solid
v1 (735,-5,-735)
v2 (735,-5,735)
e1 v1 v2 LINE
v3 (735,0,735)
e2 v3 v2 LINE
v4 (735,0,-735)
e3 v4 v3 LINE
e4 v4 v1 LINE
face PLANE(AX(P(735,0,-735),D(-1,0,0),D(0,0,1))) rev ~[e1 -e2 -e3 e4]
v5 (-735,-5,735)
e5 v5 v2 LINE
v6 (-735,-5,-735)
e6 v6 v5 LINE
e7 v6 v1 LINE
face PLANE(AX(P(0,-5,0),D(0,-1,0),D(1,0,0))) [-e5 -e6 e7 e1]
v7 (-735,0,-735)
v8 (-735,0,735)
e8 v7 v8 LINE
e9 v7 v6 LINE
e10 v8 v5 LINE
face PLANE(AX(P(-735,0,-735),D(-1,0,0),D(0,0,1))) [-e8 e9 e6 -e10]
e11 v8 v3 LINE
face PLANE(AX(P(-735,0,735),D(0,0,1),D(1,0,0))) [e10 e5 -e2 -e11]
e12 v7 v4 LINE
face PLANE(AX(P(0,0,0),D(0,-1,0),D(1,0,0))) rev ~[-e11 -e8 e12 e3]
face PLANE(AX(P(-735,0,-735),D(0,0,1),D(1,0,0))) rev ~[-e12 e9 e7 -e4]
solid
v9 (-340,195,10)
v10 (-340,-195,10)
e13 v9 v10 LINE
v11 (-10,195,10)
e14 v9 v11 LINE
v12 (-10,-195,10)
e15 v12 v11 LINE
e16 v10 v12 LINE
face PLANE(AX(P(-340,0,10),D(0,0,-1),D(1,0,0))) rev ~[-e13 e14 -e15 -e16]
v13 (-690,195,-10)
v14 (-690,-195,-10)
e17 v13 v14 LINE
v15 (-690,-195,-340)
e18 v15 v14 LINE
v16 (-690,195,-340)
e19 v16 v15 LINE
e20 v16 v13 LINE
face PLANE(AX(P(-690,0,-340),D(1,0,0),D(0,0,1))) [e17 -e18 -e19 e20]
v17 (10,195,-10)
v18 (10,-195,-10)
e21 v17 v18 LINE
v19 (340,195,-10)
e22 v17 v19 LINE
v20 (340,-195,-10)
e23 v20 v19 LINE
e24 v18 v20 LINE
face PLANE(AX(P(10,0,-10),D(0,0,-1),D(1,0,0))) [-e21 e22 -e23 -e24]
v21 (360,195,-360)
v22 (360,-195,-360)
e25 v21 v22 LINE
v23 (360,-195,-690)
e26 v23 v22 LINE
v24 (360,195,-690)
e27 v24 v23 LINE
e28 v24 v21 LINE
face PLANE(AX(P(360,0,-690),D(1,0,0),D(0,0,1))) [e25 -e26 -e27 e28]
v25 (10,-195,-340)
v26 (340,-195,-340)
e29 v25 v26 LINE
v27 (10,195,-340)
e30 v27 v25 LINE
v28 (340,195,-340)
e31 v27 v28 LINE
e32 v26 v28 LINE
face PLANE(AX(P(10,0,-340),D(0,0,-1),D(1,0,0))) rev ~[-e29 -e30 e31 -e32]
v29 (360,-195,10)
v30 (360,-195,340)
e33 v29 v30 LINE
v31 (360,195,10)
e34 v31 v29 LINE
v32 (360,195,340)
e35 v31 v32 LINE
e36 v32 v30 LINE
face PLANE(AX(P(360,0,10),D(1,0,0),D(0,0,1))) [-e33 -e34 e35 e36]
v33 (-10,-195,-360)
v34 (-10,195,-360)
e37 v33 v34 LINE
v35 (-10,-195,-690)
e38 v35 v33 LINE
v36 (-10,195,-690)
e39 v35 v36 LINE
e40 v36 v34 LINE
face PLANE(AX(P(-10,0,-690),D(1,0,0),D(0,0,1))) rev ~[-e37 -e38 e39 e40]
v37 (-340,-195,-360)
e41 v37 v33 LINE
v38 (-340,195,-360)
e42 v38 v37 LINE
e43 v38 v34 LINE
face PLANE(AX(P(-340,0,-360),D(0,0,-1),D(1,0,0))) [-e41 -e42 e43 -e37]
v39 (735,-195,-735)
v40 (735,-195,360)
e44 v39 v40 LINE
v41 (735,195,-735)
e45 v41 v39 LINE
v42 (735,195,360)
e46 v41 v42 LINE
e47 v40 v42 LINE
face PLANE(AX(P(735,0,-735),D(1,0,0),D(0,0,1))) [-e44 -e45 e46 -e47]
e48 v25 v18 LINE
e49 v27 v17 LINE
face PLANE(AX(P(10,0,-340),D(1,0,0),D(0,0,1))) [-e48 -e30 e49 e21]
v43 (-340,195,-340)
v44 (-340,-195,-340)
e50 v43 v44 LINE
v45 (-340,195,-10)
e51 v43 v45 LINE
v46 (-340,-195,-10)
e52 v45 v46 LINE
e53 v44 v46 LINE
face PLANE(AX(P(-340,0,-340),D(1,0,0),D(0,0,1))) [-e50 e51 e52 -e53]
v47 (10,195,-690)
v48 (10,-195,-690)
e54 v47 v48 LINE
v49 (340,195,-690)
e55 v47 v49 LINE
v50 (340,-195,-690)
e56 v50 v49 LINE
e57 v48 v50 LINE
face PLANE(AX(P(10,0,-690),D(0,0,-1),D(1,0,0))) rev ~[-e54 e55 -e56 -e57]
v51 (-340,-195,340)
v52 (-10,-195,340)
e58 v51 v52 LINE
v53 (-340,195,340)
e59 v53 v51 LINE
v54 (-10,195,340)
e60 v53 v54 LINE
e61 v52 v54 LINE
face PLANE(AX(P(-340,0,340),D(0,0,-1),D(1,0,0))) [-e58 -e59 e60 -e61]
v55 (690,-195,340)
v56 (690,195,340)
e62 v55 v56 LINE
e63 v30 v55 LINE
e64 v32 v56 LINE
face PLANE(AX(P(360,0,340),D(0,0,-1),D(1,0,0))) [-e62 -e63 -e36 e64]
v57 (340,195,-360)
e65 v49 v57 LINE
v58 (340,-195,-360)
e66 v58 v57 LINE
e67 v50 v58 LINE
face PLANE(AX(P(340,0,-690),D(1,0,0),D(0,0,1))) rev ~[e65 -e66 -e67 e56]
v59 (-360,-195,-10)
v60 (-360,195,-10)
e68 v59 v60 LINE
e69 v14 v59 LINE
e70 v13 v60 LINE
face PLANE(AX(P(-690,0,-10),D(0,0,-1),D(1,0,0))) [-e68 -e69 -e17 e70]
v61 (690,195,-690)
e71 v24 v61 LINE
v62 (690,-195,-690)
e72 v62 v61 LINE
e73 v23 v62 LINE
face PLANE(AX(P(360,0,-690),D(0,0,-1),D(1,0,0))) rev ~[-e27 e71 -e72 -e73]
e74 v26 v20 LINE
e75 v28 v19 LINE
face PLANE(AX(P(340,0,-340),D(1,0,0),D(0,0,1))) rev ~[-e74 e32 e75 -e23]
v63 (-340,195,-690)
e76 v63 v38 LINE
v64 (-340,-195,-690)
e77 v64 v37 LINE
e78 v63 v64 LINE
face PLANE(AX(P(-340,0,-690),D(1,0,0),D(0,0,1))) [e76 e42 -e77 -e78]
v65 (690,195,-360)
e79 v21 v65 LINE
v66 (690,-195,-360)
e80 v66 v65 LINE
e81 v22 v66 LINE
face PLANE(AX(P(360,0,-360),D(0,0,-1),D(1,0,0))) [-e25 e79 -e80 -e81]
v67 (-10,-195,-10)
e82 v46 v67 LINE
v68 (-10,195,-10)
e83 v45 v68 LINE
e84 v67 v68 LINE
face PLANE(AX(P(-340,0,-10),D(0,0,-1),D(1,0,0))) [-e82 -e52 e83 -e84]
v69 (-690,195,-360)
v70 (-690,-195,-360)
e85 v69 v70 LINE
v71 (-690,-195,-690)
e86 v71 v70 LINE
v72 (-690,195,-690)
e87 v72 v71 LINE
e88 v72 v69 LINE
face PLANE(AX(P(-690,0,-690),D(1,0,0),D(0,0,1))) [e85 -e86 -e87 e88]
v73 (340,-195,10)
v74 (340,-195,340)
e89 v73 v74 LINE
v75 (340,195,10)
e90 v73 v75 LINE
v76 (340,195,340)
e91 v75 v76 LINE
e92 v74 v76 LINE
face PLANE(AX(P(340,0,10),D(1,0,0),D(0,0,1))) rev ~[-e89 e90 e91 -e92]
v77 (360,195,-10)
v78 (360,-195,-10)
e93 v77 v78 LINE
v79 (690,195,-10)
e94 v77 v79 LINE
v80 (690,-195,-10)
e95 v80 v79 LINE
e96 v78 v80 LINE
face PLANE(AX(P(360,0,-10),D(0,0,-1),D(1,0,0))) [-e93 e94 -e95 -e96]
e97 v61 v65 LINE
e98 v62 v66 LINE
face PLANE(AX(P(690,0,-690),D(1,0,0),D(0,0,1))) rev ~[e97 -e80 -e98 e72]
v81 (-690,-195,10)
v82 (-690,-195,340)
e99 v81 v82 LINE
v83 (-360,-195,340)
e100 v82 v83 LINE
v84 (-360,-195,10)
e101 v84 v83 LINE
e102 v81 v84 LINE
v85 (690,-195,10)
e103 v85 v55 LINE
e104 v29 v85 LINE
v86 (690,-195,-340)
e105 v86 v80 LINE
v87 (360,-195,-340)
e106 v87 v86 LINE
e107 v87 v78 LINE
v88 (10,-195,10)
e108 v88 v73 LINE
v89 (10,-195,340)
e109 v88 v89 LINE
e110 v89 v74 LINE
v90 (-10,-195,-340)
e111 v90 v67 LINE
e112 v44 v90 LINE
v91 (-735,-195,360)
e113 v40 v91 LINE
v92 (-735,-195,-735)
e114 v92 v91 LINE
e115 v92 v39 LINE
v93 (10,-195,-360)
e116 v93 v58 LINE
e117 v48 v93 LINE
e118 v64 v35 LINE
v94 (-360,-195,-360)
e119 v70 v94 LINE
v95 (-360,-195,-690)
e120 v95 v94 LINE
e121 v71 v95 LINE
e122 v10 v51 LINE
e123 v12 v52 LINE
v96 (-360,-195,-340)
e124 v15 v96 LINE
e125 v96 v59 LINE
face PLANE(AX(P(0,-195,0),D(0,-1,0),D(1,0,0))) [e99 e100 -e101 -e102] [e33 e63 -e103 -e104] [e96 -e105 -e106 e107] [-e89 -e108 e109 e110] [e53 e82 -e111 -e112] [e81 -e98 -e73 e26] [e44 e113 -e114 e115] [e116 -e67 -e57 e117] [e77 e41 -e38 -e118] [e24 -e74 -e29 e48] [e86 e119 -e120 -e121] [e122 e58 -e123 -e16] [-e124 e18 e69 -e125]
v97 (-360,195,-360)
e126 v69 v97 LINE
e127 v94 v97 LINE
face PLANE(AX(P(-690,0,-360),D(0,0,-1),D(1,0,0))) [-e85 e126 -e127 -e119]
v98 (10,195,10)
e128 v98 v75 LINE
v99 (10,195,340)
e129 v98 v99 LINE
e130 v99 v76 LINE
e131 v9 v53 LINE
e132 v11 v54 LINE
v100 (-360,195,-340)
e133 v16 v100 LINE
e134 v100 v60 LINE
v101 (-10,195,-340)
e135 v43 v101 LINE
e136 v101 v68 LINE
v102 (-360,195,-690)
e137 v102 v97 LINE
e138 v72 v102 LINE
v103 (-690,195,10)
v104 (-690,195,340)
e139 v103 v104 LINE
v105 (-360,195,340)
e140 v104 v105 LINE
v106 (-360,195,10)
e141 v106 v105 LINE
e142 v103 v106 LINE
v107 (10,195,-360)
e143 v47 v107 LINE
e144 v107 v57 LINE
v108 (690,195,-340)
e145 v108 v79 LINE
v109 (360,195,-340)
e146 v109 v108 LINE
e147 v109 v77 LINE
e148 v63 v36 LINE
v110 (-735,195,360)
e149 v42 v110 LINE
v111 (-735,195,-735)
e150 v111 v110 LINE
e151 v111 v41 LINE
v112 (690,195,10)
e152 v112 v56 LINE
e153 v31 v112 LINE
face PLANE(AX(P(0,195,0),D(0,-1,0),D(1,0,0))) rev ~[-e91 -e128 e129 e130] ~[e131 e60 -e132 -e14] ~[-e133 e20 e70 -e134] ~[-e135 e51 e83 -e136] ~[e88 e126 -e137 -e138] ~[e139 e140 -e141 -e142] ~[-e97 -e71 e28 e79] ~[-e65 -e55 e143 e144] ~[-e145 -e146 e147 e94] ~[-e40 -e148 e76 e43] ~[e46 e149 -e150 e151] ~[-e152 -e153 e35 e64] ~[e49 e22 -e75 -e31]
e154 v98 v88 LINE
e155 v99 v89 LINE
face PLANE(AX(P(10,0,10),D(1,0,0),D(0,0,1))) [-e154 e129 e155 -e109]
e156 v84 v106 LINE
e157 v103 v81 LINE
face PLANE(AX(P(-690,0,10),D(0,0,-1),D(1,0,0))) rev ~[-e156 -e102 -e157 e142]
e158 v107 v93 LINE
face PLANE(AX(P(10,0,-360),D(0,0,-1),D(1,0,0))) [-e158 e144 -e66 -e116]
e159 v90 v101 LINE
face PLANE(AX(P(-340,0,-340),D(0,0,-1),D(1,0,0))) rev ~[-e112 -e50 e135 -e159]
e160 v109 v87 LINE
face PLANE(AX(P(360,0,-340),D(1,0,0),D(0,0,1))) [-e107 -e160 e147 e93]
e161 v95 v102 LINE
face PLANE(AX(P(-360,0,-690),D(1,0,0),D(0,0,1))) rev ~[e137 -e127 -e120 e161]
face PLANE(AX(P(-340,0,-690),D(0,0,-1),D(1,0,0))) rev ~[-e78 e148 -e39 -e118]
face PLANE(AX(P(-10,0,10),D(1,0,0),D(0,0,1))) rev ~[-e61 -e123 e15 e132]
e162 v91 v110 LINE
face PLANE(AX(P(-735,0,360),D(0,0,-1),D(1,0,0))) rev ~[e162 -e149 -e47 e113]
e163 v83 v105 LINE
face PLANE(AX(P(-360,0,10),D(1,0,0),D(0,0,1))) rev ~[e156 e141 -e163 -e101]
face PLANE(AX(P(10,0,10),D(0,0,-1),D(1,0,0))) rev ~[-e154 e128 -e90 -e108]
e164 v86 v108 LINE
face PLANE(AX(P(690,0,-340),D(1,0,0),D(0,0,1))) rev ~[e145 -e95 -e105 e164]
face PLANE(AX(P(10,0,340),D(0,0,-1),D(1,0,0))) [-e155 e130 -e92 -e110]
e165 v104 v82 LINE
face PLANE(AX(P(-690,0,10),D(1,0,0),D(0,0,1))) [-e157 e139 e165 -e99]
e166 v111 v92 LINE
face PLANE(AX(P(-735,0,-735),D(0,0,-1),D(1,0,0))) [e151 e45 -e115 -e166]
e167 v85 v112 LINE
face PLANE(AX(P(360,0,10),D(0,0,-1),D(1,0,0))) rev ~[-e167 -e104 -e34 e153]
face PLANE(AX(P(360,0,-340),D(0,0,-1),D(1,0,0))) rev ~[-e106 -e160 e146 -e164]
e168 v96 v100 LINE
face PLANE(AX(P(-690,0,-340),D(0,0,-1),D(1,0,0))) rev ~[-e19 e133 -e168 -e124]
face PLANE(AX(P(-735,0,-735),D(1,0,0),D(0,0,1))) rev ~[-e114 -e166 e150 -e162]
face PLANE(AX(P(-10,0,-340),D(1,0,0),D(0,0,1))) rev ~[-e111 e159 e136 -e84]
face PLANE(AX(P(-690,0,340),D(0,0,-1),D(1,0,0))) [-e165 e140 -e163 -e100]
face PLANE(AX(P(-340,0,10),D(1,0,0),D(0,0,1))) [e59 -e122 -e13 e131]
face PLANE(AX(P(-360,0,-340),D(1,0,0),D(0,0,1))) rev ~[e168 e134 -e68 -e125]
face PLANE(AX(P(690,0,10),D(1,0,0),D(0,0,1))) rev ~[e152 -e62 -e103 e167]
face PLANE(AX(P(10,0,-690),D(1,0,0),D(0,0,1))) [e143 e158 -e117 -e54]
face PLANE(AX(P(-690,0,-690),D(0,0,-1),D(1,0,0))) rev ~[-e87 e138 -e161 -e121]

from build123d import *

# Parameters (mm, degrees)
F0_W     = 1470
F0_H     = 1470
F0_W_2   = 330
F0_H_2   = 330
F1_DEPTH = 195
F2_DEPTH = 5
F3_DEPTH = 375


with BuildPart() as f1:
    # F0 (on Front) → F1 (new body, symmetric)
    with BuildSketch(Plane.XZ):
        Rectangle(F0_W, F0_H)
        with Locations((-525, -525)):
            Rectangle(F0_W_2, F0_H_2, mode=Mode.SUBTRACT)
        with Locations((-175, -525)):
            Rectangle(F0_W_2, F0_H_2, mode=Mode.SUBTRACT)
        with Locations((-525, -175)):
            Rectangle(F0_W_2, F0_H_2, mode=Mode.SUBTRACT)
        with Locations((-175, -175)):
            Rectangle(F0_W_2, F0_H_2, mode=Mode.SUBTRACT)
        with Locations((175, -525)):
            Rectangle(F0_W_2, F0_H_2, mode=Mode.SUBTRACT)
        with Locations((525, -525)):
            Rectangle(F0_W_2, F0_H_2, mode=Mode.SUBTRACT)
        with Locations((175, -175)):
            Rectangle(F0_W_2, F0_H_2, mode=Mode.SUBTRACT)
        with Locations((525, -175)):
            Rectangle(F0_W_2, F0_H_2, mode=Mode.SUBTRACT)
        with Locations((-525, 175)):
            Rectangle(F0_W_2, F0_H_2, mode=Mode.SUBTRACT)
        with Locations((-175, 175)):
            Rectangle(F0_W_2, F0_H_2, mode=Mode.SUBTRACT)
        with Locations((-525, 525)):
            Rectangle(F0_W_2, F0_H_2, mode=Mode.SUBTRACT)
        with Locations((-175, 525)):
            Rectangle(F0_W_2, F0_H_2, mode=Mode.SUBTRACT)
        with Locations((175, 175)):
            Rectangle(F0_W_2, F0_H_2, mode=Mode.SUBTRACT)
        with Locations((525, 175)):
            Rectangle(F0_W_2, F0_H_2, mode=Mode.SUBTRACT)
        with Locations((175, 525)):
            Rectangle(F0_W_2, F0_H_2, mode=Mode.SUBTRACT)
        with Locations((525, 525)):
            Rectangle(F0_W_2, F0_H_2, mode=Mode.SUBTRACT)
    extrude(amount=F1_DEPTH, both=True)

    # F3 (cut, through all): a face of the model
    f3_faces = [f1.faces().sort_by_distance(p)[0] for p in [
        (0, 0, 735),
    ]]
    extrude(f3_faces, amount=-F3_DEPTH, mode=Mode.SUBTRACT)


with BuildPart() as f2:
    # F0 (on Front) → F2 (new body)
    with BuildSketch(Plane.XZ):
        Rectangle(F0_W, F0_H)
        with Locations((-525, -525)):
            Rectangle(F0_W_2, F0_H_2, mode=Mode.SUBTRACT)
        with Locations((-175, -525)):
            Rectangle(F0_W_2, F0_H_2, mode=Mode.SUBTRACT)
        with Locations((-525, -175)):
            Rectangle(F0_W_2, F0_H_2, mode=Mode.SUBTRACT)
        with Locations((-175, -175)):
            Rectangle(F0_W_2, F0_H_2, mode=Mode.SUBTRACT)
        with Locations((175, -525)):
            Rectangle(F0_W_2, F0_H_2, mode=Mode.SUBTRACT)
        with Locations((525, -525)):
            Rectangle(F0_W_2, F0_H_2, mode=Mode.SUBTRACT)
        with Locations((175, -175)):
            Rectangle(F0_W_2, F0_H_2, mode=Mode.SUBTRACT)
        with Locations((525, -175)):
            Rectangle(F0_W_2, F0_H_2, mode=Mode.SUBTRACT)
        with Locations((-525, 175)):
            Rectangle(F0_W_2, F0_H_2, mode=Mode.SUBTRACT)
        with Locations((-175, 175)):
            Rectangle(F0_W_2, F0_H_2, mode=Mode.SUBTRACT)
        with Locations((-525, 525)):
            Rectangle(F0_W_2, F0_H_2, mode=Mode.SUBTRACT)
        with Locations((-175, 525)):
            Rectangle(F0_W_2, F0_H_2, mode=Mode.SUBTRACT)
        with Locations((175, 175)):
            Rectangle(F0_W_2, F0_H_2, mode=Mode.SUBTRACT)
        with Locations((525, 175)):
            Rectangle(F0_W_2, F0_H_2, mode=Mode.SUBTRACT)
        with Locations((175, 525)):
            Rectangle(F0_W_2, F0_H_2, mode=Mode.SUBTRACT)
        with Locations((525, 525)):
            Rectangle(F0_W_2, F0_H_2, mode=Mode.SUBTRACT)
        with Locations((525, 525)):
            Rectangle(F0_W_2, F0_H_2)
        with Locations((175, 525)):
            Rectangle(F0_W_2, F0_H_2)
        with Locations((-175, 525)):
            Rectangle(F0_W_2, F0_H_2)
        with Locations((-525, 525)):
            Rectangle(F0_W_2, F0_H_2)
        with Locations((-525, 175)):
            Rectangle(F0_W_2, F0_H_2)
        with Locations((-175, 175)):
            Rectangle(F0_W_2, F0_H_2)
        with Locations((-175, -175)):
            Rectangle(F0_W_2, F0_H_2)
        with Locations((-525, -175)):
            Rectangle(F0_W_2, F0_H_2)
        with Locations((-525, -525)):
            Rectangle(F0_W_2, F0_H_2)
        with Locations((-175, -525)):
            Rectangle(F0_W_2, F0_H_2)
        with Locations((175, -525)):
            Rectangle(F0_W_2, F0_H_2)
        with Locations((525, -525)):
            Rectangle(F0_W_2, F0_H_2)
        with Locations((525, -175)):
            Rectangle(F0_W_2, F0_H_2)
        with Locations((525, 175)):
            Rectangle(F0_W_2, F0_H_2)
        with Locations((175, 175)):
            Rectangle(F0_W_2, F0_H_2)
        with Locations((175, -175)):
            Rectangle(F0_W_2, F0_H_2)
    extrude(amount=F2_DEPTH)


solid = Compound([f1.part, f2.part])
